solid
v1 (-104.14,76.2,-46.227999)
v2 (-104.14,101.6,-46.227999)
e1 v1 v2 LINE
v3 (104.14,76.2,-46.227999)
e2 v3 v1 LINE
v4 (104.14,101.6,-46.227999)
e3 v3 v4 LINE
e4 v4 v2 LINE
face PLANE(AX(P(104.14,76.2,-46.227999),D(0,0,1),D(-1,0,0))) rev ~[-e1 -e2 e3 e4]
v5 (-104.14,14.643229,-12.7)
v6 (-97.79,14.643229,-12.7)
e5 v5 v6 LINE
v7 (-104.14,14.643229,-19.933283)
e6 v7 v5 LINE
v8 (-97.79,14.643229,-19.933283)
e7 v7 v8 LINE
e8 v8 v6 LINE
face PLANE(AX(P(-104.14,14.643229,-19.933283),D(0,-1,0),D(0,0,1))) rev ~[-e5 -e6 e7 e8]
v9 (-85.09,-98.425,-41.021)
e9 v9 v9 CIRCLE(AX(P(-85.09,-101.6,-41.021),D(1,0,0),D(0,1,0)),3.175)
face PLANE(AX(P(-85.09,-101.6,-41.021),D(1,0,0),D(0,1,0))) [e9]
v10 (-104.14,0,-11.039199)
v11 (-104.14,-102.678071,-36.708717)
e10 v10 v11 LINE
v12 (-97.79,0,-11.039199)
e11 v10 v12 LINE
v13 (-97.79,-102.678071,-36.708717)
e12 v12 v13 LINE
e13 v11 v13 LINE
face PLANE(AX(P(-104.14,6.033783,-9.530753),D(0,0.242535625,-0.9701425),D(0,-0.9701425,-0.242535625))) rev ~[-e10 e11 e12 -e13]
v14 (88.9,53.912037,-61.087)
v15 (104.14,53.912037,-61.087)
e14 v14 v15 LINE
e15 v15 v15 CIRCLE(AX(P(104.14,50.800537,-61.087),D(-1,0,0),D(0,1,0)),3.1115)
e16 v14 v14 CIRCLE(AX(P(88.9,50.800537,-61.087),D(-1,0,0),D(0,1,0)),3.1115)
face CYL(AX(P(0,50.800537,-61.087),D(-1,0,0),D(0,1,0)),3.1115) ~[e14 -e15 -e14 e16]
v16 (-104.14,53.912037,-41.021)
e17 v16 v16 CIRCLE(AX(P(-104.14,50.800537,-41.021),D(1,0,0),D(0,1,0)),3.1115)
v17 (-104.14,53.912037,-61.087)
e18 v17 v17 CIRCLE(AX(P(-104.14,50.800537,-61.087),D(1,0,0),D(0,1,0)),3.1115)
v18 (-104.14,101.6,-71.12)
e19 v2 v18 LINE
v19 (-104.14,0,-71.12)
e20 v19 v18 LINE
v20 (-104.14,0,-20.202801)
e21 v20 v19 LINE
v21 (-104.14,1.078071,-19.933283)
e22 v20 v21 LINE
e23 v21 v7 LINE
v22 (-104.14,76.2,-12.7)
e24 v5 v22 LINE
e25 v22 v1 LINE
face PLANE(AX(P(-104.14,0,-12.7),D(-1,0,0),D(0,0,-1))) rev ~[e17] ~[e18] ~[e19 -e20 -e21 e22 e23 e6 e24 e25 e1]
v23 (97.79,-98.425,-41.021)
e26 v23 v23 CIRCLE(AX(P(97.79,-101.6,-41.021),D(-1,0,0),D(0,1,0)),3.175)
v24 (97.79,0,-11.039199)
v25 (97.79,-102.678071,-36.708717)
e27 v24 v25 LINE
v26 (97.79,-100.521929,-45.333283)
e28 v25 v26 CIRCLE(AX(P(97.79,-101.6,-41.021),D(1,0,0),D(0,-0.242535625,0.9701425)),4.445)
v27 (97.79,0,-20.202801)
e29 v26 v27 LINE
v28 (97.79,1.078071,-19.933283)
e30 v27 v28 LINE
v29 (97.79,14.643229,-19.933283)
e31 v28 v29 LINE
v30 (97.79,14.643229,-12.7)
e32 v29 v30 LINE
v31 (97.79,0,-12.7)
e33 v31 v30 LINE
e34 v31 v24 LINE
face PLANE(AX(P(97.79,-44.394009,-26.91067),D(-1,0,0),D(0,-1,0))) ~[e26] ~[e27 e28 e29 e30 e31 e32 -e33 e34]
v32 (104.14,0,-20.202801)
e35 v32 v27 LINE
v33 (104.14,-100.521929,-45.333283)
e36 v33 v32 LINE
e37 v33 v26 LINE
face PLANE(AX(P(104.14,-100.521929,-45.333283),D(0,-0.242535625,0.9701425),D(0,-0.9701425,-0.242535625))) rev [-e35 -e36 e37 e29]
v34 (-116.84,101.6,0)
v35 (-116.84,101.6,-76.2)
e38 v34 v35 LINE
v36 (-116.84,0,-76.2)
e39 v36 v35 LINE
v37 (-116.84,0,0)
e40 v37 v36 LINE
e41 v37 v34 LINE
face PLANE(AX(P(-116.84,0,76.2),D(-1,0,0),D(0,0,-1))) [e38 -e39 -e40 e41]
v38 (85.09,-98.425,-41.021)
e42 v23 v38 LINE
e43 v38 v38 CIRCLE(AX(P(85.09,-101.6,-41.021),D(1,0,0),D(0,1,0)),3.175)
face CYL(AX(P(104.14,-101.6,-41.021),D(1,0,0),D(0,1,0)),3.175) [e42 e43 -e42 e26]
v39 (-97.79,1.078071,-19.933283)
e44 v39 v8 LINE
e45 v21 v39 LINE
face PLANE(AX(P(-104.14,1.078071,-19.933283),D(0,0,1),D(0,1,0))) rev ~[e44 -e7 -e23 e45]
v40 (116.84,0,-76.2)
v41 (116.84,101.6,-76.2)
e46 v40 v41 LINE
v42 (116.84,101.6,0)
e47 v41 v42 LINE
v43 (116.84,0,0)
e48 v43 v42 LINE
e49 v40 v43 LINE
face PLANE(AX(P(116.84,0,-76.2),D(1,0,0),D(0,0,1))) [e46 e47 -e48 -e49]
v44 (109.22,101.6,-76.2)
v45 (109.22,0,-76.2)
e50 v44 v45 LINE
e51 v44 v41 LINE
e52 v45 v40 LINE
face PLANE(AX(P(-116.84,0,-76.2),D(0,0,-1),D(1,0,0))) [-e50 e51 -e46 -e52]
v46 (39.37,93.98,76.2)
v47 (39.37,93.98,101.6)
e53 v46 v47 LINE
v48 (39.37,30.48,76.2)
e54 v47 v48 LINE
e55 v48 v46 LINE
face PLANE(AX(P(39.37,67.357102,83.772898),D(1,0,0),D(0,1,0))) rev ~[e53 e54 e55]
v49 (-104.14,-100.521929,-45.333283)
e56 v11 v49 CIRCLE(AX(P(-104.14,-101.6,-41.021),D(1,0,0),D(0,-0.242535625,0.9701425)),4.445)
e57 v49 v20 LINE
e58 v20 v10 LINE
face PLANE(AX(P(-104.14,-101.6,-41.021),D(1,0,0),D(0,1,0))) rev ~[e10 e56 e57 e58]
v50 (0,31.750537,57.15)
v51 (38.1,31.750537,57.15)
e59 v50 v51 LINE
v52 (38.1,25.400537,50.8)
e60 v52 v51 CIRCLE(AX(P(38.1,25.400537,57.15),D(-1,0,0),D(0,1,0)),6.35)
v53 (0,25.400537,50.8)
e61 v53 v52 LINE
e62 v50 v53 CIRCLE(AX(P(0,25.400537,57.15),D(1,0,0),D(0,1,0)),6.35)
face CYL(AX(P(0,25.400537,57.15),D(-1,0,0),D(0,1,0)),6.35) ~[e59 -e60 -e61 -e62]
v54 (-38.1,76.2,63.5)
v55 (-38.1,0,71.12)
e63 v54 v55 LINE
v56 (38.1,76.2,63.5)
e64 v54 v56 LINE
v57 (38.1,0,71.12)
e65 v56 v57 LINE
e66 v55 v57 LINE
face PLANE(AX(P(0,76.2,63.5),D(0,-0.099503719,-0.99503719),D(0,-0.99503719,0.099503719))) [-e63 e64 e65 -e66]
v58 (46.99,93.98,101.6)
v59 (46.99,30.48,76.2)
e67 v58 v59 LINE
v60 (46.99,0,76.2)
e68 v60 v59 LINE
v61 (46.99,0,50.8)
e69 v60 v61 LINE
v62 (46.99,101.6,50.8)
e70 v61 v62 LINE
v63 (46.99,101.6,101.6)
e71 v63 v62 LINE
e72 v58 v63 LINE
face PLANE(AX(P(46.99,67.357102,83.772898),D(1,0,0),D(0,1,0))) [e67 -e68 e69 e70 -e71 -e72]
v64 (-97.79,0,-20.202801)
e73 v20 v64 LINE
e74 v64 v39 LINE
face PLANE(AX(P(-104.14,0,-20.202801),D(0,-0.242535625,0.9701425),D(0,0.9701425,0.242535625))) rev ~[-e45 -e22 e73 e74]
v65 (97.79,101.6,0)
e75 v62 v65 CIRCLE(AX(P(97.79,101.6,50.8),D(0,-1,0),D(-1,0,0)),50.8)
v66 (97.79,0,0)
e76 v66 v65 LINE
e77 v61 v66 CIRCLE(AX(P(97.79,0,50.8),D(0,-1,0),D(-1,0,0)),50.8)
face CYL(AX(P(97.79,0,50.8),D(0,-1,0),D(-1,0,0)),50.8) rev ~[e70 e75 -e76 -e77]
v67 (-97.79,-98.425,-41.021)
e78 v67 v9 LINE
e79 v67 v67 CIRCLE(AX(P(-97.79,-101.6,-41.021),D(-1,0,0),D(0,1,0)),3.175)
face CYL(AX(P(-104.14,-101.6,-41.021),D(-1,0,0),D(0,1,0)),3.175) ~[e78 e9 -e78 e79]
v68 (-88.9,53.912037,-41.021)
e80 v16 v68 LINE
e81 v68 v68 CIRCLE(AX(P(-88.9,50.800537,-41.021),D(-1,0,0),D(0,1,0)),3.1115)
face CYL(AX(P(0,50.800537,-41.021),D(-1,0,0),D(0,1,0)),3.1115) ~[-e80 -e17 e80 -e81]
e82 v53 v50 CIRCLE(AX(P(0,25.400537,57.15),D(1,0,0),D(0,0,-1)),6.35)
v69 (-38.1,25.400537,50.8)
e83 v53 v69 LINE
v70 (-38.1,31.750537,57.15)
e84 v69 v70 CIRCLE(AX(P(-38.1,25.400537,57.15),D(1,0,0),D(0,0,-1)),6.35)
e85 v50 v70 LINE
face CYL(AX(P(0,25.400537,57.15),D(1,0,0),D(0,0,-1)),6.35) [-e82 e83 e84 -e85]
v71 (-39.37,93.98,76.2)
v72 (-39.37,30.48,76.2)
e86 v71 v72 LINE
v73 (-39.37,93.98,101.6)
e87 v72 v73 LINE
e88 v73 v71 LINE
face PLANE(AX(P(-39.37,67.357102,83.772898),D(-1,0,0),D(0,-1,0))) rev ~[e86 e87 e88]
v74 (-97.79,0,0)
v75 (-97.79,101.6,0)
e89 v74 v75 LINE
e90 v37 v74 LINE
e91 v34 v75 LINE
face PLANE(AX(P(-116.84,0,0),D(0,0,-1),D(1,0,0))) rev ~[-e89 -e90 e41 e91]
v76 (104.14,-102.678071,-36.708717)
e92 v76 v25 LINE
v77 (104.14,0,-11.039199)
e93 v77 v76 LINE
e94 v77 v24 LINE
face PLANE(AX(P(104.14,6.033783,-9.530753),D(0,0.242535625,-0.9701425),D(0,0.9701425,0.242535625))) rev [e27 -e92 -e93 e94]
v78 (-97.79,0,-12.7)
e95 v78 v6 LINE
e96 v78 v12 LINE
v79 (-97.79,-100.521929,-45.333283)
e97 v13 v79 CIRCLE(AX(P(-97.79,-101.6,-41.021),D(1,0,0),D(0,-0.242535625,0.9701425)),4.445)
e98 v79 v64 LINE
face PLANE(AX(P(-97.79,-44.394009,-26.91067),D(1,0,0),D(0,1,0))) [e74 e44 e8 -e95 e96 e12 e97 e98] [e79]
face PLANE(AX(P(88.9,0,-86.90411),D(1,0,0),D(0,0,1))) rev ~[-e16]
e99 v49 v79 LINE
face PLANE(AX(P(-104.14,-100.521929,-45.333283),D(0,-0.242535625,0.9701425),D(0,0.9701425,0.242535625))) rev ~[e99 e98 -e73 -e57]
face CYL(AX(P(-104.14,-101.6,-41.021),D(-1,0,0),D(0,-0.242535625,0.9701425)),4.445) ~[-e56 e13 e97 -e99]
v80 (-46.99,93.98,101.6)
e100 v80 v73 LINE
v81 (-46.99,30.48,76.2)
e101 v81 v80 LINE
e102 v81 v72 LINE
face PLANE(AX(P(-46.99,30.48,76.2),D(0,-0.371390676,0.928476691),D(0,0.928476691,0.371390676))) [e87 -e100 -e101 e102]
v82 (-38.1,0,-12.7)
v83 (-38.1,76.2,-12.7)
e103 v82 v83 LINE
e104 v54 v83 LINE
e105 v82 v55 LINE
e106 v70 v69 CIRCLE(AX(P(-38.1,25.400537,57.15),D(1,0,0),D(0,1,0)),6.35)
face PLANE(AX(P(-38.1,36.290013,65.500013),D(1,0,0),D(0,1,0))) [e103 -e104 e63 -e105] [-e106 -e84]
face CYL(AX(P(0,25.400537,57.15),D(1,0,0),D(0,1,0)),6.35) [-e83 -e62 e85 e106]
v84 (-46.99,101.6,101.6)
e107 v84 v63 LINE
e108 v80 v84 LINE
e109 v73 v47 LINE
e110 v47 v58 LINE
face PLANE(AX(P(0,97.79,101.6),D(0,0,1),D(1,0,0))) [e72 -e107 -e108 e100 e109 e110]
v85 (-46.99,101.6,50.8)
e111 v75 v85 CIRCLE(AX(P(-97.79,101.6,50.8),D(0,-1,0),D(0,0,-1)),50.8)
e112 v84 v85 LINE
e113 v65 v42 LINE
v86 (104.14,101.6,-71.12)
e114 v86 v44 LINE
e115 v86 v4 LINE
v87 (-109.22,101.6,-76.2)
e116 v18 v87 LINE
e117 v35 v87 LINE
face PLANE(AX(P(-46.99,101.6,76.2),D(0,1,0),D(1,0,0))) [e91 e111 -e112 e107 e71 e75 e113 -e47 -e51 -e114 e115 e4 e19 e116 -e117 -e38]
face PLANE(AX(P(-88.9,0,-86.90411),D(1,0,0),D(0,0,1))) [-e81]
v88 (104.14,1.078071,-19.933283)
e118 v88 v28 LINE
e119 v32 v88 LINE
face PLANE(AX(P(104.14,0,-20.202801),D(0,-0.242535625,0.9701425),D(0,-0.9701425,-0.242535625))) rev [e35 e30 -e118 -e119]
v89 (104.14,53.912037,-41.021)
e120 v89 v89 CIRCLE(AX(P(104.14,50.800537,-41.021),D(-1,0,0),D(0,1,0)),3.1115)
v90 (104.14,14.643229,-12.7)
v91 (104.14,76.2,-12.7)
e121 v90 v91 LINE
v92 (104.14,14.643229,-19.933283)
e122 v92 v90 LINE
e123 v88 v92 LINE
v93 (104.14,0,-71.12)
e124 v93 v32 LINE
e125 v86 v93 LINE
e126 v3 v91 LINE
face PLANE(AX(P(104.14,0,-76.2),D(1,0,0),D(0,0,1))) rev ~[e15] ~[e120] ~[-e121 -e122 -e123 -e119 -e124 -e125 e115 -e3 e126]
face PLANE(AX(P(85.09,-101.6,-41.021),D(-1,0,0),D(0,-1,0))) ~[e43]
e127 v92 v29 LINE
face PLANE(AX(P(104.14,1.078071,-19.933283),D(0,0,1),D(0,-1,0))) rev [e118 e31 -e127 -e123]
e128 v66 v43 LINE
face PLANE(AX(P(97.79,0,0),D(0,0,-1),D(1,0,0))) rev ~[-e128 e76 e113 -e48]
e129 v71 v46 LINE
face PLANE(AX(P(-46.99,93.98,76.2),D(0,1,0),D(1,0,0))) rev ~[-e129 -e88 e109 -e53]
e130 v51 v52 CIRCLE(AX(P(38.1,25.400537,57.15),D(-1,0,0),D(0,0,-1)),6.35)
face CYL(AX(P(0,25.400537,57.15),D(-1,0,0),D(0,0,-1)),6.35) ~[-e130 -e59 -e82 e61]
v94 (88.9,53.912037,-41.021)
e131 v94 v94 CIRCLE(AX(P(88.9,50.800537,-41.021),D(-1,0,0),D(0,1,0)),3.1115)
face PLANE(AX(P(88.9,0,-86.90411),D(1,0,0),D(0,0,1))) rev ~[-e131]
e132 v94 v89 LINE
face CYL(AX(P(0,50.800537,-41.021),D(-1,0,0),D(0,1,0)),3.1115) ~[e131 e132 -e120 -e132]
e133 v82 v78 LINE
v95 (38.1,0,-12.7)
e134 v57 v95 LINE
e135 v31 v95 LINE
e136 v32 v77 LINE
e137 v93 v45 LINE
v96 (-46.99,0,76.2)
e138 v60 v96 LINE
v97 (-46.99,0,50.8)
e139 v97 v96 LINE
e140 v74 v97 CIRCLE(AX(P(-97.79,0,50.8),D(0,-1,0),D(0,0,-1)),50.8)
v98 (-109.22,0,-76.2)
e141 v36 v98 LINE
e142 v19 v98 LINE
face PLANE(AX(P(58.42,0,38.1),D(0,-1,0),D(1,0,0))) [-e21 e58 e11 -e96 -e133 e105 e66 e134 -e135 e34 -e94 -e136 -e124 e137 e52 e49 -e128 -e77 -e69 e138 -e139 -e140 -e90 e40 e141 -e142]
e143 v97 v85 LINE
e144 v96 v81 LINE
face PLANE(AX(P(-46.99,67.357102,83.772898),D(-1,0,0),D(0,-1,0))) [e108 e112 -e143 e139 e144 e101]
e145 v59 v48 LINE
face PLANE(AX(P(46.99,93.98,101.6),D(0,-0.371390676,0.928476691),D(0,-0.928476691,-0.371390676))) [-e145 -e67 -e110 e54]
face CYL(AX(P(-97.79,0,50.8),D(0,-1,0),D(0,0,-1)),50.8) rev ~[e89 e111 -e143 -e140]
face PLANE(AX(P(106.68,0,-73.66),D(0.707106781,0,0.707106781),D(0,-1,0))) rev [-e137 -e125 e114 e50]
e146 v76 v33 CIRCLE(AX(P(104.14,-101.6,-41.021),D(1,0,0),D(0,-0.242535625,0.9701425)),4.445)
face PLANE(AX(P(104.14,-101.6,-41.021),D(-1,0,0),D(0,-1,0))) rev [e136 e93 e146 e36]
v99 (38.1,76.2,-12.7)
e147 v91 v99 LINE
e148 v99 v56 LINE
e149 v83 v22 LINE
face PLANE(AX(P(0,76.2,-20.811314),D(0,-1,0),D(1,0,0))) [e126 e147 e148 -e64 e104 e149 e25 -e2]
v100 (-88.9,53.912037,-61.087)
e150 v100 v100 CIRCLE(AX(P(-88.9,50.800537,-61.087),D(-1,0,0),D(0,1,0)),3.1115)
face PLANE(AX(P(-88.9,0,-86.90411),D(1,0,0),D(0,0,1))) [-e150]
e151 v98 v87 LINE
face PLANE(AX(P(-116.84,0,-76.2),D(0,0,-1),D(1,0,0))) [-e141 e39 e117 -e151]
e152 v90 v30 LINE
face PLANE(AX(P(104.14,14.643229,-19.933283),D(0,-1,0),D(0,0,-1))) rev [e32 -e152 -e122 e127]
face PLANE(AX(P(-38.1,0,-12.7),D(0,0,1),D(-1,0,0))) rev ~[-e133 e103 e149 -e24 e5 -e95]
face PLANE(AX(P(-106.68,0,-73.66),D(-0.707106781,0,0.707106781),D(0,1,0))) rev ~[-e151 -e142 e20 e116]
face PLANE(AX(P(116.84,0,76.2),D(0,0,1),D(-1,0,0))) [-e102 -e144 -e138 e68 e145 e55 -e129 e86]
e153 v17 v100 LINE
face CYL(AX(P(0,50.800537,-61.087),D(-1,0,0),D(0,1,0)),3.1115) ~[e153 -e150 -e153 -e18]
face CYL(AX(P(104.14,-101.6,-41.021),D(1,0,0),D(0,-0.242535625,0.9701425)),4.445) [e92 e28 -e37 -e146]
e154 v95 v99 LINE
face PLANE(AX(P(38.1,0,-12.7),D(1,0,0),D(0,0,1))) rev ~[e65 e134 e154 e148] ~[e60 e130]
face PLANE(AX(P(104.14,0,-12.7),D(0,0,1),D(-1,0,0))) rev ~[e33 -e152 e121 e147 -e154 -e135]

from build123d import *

# Parameters (mm, degrees)
F0_W          = 116.84
F0_H          = 76.2
F1_DEPTH      = 101.6
F3_DEPTH      = 76.2
F5_DEPTH      = 38.1
F5_DEPTH_BACK = 38.1
F6_R          = 3.1115
F7_DEPTH      = 114.3
F7_DEPTH_BACK = 114.3
F9_DEPTH      = 101.601
F11_DEPTH     = 25.401
F12_SIZE      = 5.08
F13_W         = 177.8
F13_H         = 62.1990481529
F14_DEPTH     = 76.2
F15_W         = 93.98
F15_H         = 7.62
F16_DEPTH     = 25.4
F18_DEPTH     = 7.62
F20_DEPTH     = 7.62
F21_R         = 3.175
F22_DEPTH     = 6.35
F23_DEPTH     = 19.05


with BuildPart() as f1:
    # F0 (on Front) → F1 (new body)
    with BuildSketch(Plane.XZ):
        with Locations((58.42, 38.1)):
            Rectangle(F0_W, F0_H)
        with Locations((-58.42, 38.1)):
            Rectangle(F0_W, F0_H)
        with Locations((58.42, -38.1)):
            Rectangle(F0_W, F0_H)
        with Locations((-58.42, -38.1)):
            Rectangle(F0_W, F0_H)
    extrude(amount=-F1_DEPTH)

    # F2 (on face) → F3 (cut)
    with BuildSketch(Plane.XZ):
        Polygon((-38.1, -12.7), (-104.14, -12.7), (-104.14, -69.85), (-104.14, -76.2), (104.14, -76.2), (104.14, -69.85), (104.14, -12.7), (38.1, -12.7), (38.1, 63.5), (-38.1, 63.5), align=None)
    extrude(amount=-F3_DEPTH, mode=Mode.SUBTRACT)

    # F4 (on Right) → F5 (cut, two sides)
    with BuildSketch(Plane.YZ) as f5_sk:
        Polygon((0, 71.12), (0, 63.5), (76.2, 63.5), align=None)
    extrude(amount=-F5_DEPTH, mode=Mode.SUBTRACT)
    extrude(f5_sk.sketch, amount=F5_DEPTH_BACK, mode=Mode.SUBTRACT)

    # F6 (on Right) → F7 (join, two sides)
    with BuildSketch(Plane.YZ) as f7_sk:
        with BuildLine():
            ThreePointArc((25.4005372305, 50.8), (29.8906652911, 52.6598719395), (31.7505372305, 57.15))
            ThreePointArc((31.7505372305, 57.15), (20.91040917, 61.6401280605), (25.4005372305, 50.8))
        make_face()
        with Locations((50.8005372305, -41.021)):
            Circle(F6_R)
        with Locations((50.8005372305, -61.087)):
            Circle(F6_R)
    extrude(amount=F7_DEPTH)
    extrude(f7_sk.sketch, amount=-F7_DEPTH_BACK)

    # F8 (on face) → F9 (cut, through all)
    with BuildSketch(Plane.XZ):
        with BuildLine():
            Line((-46.99, 76.2), (-116.84, 76.2))
            Line((-116.84, 76.2), (-116.84, 0))
            Line((-116.84, 0), (-97.79, 0))
            ThreePointArc((-97.79, 0), (-61.8689755157, 14.8789755157), (-46.99, 50.8))
            Line((-46.99, 50.8), (-46.99, 76.2))
        make_face()
        with BuildLine():
            Line((116.84, 0), (116.84, 76.2))
            Line((116.84, 76.2), (46.99, 76.2))
            Line((46.99, 76.2), (46.99, 50.8))
            ThreePointArc((46.99, 50.8), (61.8689755157, 14.8789755157), (97.79, 0))
            Line((97.79, 0), (116.84, 0))
        make_face()
    extrude(amount=-F9_DEPTH, mode=Mode.SUBTRACT)

    # F10 (on face) → F11 (cut, through all)
    with BuildSketch(Plane.XZ.offset(-76.2)):
        Polygon((104.14, -76.2), (104.14, -48.7679988146), (104.14, -46.2279988146), (-104.14, -46.2279988146), (-104.14, -48.7679988146), (-104.14, -76.2), align=None)
    extrude(amount=-F11_DEPTH, mode=Mode.SUBTRACT)

    # F12
    f12_edges = [f1.edges().sort_by_distance(p)[0] for p in [
        (104.14, 50.8, -76.2),
        (-104.14, 50.8, -76.2),
    ]]
    chamfer(f12_edges, length=F12_SIZE)

    # F13 (on Front) → F14 (cut)
    with BuildSketch(Plane.XZ):
        with Locations((0, -55.8045858206)):
            Rectangle(F13_W, F13_H)
    extrude(amount=-F14_DEPTH, mode=Mode.SUBTRACT)

    # F15 (on face) → F16 (join)
    with BuildSketch(Plane.XY.offset(76.2)):
        with Locations((0, 97.79)):
            Rectangle(F15_W, F15_H)
    extrude(amount=F16_DEPTH)

    # F17 (on face) → F18 (join)
    with BuildSketch(Plane.YZ.offset(46.99)):
        Polygon((93.98, 76.2), (93.98, 101.6), (30.48, 76.2), align=None)
    extrude(amount=-F18_DEPTH)

    # F19 (on face) → F20 (join)
    with BuildSketch(Plane(origin=(-46.99, 0, 0), x_dir=(0, -1, 0), z_dir=(-1, 0, 0))):
        Polygon((-30.48, 76.2), (-93.98, 101.6), (-93.98, 76.2), align=None)
    extrude(amount=-F20_DEPTH)

    # F21 (on face) → F22 (join)
    with BuildSketch(Plane.YZ.offset(-104.14)):
        with BuildLine():
            Line((6.0337829095, -9.5307531462), (-1.0780708533, -11.3087165869))
            Line((-1.0780708533, -11.3087165869), (-102.6780708533, -36.7087165869))
            ThreePointArc((-102.6780708533, -36.7087165869), (-105.9122834131, -42.0990708533), (-100.5219291467, -45.3332834131))
            Line((-100.5219291467, -45.3332834131), (0, -20.2028011265))
            Line((0, -20.2028011265), (1.0780708533, -19.9332834131))
            Line((1.0780708533, -19.9332834131), (14.6432286128, -19.9332834131))
            Line((14.6432286128, -19.9332834131), (14.6432286128, -9.5307531462))
            Line((14.6432286128, -9.5307531462), (6.0337829095, -9.5307531462))
        make_face()
        with Locations((-101.6, -41.021)):
            Circle(F21_R, mode=Mode.SUBTRACT)
        with Locations((-101.6, -41.021)):
            Circle(F21_R)
    extrude(amount=F22_DEPTH)

    # F21 (on face) → F23 (join)
    with BuildSketch(Plane.YZ.offset(-104.14)):
        with Locations((-101.6, -41.021)):
            Circle(F21_R)
    extrude(amount=F23_DEPTH)

    # F24: F1 across plane


with BuildPart() as f1_1:
    add(f1.part)
    add(f1.part.mirror(Plane.YZ))


solid = f1_1.part
